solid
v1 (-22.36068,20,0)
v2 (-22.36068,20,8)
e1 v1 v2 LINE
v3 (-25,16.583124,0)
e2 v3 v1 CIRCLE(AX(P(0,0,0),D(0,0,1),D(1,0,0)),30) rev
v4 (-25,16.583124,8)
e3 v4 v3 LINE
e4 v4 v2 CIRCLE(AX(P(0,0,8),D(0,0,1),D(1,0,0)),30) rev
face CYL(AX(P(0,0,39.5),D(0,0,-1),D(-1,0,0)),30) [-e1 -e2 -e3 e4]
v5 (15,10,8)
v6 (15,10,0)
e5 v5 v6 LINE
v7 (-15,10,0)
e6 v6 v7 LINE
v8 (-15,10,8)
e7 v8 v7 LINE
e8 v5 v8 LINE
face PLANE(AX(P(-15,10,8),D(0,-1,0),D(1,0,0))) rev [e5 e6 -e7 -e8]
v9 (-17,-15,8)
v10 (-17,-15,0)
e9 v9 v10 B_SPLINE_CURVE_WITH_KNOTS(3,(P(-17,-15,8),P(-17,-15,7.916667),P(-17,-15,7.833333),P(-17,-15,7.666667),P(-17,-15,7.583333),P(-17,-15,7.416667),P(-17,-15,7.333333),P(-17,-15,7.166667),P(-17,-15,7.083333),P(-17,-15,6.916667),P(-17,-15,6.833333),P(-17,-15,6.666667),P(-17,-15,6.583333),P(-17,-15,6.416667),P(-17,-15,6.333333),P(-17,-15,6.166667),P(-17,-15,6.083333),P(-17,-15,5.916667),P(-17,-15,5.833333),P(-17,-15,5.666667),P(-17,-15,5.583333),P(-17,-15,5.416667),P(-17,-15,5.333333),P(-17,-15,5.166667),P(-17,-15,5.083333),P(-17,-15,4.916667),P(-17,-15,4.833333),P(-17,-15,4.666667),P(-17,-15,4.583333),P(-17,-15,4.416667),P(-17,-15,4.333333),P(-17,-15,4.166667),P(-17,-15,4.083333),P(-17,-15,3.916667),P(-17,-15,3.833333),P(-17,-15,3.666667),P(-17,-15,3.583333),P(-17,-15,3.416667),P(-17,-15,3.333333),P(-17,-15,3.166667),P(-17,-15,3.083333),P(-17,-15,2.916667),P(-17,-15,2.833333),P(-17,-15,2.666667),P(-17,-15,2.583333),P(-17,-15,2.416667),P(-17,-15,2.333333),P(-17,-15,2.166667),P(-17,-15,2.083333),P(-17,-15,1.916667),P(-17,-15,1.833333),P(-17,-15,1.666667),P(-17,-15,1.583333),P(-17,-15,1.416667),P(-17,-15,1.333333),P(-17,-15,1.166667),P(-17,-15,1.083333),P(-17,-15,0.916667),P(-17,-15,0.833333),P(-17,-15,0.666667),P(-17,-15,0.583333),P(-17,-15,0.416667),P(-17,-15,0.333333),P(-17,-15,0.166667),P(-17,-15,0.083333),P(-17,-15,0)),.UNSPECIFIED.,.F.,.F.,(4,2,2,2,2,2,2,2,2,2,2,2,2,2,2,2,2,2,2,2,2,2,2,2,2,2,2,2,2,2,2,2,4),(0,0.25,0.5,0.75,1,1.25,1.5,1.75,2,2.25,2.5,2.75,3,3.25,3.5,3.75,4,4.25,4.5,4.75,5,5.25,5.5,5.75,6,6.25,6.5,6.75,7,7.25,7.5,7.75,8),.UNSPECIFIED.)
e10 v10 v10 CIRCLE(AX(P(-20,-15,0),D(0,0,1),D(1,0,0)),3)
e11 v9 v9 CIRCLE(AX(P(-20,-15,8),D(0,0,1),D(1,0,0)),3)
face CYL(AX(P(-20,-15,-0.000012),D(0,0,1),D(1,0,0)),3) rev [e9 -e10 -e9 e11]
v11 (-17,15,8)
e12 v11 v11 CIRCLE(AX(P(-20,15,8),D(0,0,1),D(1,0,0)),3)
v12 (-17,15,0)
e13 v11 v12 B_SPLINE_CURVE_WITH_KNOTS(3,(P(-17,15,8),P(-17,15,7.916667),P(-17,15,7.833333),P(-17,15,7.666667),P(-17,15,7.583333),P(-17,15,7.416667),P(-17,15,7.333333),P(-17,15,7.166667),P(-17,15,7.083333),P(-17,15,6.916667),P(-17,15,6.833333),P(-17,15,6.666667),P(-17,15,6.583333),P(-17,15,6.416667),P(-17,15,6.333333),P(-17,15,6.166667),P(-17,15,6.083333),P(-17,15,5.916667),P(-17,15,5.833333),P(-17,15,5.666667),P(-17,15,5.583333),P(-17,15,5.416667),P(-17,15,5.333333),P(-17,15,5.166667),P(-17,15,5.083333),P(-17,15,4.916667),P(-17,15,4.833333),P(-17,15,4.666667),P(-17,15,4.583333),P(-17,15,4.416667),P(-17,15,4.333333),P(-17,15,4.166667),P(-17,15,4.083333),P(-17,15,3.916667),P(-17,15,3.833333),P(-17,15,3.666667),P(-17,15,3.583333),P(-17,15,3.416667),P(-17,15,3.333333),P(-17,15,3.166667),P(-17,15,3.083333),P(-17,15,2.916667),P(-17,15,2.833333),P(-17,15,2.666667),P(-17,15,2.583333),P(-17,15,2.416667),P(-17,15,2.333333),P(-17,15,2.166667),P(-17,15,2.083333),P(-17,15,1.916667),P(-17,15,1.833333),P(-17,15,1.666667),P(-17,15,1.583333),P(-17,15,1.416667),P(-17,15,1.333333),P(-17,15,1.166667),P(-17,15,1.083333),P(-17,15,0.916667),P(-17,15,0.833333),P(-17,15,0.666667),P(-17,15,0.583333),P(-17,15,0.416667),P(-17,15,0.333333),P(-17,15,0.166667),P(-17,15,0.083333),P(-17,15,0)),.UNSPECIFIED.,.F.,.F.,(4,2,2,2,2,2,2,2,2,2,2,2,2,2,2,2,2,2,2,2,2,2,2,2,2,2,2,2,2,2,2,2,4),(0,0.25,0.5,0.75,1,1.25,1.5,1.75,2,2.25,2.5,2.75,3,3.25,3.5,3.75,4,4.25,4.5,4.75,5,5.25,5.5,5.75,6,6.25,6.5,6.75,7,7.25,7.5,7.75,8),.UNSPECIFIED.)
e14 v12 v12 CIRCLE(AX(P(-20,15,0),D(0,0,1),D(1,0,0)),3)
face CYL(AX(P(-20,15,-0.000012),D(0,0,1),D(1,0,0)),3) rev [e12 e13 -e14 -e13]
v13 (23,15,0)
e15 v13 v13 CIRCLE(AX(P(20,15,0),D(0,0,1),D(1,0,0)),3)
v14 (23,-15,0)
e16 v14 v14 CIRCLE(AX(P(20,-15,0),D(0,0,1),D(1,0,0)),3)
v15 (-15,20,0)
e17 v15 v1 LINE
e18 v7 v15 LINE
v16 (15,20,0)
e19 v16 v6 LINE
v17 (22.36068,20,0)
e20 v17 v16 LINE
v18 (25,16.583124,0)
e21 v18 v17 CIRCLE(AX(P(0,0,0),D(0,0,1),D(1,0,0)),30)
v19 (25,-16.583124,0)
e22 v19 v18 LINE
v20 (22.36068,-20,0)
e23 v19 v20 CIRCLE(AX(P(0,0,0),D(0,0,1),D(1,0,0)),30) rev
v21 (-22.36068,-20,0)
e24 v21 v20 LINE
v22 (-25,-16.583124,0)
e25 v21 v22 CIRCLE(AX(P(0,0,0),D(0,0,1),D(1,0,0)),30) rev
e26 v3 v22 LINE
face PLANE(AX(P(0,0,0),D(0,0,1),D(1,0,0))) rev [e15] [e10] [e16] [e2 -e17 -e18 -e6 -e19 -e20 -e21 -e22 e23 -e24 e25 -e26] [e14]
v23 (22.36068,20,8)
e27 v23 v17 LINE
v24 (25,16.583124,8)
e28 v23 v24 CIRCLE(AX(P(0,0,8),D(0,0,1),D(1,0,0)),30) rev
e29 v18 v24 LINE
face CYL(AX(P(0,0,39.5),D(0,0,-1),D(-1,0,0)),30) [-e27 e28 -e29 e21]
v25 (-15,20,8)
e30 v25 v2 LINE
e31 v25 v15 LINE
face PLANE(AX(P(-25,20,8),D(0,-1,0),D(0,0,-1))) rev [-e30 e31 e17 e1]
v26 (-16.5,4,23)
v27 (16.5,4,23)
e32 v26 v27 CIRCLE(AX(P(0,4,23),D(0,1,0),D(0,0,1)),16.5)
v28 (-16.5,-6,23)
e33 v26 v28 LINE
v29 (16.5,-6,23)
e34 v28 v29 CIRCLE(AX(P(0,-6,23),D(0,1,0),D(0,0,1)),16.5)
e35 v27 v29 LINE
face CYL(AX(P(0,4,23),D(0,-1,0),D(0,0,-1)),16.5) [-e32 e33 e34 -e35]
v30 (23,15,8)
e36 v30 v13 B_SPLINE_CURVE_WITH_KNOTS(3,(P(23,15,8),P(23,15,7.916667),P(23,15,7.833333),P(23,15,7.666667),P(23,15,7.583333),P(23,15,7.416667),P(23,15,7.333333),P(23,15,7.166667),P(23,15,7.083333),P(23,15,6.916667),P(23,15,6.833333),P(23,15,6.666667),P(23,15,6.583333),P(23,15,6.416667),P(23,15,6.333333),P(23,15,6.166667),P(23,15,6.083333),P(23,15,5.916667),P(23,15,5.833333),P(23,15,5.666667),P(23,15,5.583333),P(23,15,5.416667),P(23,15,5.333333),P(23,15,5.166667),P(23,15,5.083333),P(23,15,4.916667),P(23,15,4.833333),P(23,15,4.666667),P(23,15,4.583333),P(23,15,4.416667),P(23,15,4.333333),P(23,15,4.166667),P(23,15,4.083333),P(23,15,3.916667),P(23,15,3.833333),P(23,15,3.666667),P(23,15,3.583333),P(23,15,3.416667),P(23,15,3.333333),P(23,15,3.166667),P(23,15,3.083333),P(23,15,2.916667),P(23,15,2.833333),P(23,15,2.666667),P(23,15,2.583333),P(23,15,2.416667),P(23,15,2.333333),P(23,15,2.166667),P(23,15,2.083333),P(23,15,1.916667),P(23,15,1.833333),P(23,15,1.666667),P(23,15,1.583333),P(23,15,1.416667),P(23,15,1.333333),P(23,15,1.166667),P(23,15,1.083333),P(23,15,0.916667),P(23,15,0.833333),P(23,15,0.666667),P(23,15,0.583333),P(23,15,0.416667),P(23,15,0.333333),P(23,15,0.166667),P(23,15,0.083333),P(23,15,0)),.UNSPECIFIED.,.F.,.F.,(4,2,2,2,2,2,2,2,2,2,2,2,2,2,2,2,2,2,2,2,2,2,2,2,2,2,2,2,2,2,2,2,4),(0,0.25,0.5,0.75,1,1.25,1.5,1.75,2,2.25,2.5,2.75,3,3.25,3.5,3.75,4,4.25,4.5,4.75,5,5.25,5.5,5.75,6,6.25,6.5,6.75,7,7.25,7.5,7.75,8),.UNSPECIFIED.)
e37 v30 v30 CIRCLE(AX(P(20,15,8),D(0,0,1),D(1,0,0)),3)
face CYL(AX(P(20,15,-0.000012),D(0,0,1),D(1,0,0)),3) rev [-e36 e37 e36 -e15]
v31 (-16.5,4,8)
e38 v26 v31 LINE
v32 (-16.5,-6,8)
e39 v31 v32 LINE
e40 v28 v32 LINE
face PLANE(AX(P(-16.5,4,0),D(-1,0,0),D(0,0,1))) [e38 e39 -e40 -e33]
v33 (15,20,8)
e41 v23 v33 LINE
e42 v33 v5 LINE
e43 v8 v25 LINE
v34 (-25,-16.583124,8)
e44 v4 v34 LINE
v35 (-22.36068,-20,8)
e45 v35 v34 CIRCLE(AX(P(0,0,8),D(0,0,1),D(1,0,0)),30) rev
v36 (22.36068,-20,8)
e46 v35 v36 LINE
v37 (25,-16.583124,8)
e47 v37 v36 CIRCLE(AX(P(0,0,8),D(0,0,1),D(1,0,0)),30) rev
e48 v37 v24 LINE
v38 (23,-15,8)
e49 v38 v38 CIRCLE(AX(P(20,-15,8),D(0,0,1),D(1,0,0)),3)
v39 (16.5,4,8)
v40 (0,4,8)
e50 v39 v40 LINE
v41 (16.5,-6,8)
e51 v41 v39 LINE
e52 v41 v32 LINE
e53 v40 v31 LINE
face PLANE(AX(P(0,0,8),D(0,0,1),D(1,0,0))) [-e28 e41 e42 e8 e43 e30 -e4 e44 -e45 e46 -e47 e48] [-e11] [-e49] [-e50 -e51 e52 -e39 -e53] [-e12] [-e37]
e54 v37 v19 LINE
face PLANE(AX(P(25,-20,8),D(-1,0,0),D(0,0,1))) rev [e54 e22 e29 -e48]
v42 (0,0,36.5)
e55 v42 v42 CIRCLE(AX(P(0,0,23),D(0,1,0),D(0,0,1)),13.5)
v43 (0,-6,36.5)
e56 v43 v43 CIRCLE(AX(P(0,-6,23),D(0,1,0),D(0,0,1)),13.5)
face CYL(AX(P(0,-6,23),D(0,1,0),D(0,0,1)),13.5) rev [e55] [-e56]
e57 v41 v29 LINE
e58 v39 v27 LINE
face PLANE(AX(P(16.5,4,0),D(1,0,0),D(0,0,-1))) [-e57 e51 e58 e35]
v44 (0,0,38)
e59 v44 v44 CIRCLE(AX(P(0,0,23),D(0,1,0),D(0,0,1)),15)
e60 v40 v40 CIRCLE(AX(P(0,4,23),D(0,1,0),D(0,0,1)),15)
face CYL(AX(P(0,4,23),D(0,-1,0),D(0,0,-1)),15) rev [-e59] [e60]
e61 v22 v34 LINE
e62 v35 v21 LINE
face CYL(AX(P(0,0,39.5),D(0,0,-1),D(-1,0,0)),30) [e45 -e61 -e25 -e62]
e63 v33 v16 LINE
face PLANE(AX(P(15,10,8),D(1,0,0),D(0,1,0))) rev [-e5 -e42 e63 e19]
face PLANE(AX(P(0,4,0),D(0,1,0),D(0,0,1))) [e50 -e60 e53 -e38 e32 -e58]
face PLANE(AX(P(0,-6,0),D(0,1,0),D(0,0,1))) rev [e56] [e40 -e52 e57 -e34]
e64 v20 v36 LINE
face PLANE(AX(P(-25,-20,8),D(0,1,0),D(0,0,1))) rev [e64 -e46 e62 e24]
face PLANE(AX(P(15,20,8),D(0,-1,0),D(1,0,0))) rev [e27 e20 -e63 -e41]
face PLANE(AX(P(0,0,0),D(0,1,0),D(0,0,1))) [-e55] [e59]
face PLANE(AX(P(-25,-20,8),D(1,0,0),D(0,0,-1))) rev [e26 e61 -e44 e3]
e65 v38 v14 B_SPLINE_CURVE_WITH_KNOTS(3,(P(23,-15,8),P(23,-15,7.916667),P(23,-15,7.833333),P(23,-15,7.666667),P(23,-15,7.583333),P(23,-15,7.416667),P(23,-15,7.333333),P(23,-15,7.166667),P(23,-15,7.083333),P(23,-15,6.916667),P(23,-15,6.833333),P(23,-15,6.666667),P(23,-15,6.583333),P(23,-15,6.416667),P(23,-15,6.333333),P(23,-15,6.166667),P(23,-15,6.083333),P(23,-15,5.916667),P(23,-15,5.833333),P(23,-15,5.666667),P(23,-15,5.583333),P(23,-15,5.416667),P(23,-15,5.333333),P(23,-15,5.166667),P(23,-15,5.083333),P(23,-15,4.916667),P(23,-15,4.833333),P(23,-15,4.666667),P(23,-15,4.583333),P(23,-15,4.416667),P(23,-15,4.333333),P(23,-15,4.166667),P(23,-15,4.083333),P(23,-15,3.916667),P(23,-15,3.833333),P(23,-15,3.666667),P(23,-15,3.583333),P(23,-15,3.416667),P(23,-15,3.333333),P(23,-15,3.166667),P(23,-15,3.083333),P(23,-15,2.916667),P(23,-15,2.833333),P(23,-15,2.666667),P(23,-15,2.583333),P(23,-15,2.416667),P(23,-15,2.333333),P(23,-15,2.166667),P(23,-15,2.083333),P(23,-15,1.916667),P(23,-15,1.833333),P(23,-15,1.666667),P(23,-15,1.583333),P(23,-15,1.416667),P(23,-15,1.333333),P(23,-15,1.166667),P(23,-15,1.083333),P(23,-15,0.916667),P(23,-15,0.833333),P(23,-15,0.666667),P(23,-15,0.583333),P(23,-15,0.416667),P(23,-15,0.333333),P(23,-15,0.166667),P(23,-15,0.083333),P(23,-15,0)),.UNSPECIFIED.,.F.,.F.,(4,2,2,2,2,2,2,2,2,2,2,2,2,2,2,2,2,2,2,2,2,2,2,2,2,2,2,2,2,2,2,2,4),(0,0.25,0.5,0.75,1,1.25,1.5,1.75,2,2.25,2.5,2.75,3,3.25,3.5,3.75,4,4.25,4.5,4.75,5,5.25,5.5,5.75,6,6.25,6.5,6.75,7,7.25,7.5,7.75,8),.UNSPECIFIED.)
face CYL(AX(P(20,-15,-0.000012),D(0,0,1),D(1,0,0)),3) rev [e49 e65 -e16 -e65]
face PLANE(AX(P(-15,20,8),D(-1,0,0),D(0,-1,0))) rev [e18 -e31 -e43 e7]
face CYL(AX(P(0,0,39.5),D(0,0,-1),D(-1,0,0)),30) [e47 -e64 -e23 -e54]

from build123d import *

# Parameters (mm, degrees)
BOSS_EXTRUDE1_DEPTH     = 8
CUT_EXTRUDE4_DEPTH      = 34
CUT_EXTRUDE4_DEPTH_BACK = 34
SKETCH2_R               = 3
SKETCH3_R               = 15
BOSS_EXTRUDE2_DEPTH     = 4
BOSS_EXTRUDE4_START     = -6
SKETCH3_5_R             = 15
SKETCH3_5_R_2           = 13.5
BOSS_EXTRUDE4_DEPTH     = 6
CUT_EXTRUDE5_DEPTH      = 8


# Read off the part's stored shape, not the designer's step: Cut-Extrude5
with BuildPart() as part:
    # Sketch1 → Boss-Extrude1 (new body)
    with BuildSketch(Plane.XY):
        Polygon((-25, -20), (25, -20), (25, 20), (15, 20), (15, 10), (-15, 10), (-15, 20), (-25, 20), align=None)
    extrude(amount=BOSS_EXTRUDE1_DEPTH)

    # Sketch2 → Cut-Extrude4 (cut, two sides: drawn at the far end of the back side and taken through both)
    with BuildSketch(Plane.XY.offset(-CUT_EXTRUDE4_DEPTH_BACK)):
        with Locations((-20, 15)):
            Circle(SKETCH2_R)
        with Locations((-20, -15)):
            Circle(SKETCH2_R)
        with Locations((20, -15)):
            Circle(SKETCH2_R)
        with Locations((20, 15)):
            Circle(SKETCH2_R)
    extrude(amount=CUT_EXTRUDE4_DEPTH + CUT_EXTRUDE4_DEPTH_BACK, mode=Mode.SUBTRACT)

    # Sketch3 → Boss-Extrude2 (add)
    with BuildSketch(Plane(origin=(0, 0, 0), x_dir=(1, 0, 0), z_dir=(0, 1, 0))):
        with BuildLine():
            Line((-16.5, -23), (-16.5, -7))
            Line((-16.5, -7), (16.5, -7))
            Line((16.5, -7), (16.5, -23))
            ThreePointArc((16.5, -23), (0, -39.5), (-16.5, -23))
        make_face()
        with Locations(Location((0, -23, 0), (0, 0, 90))):
            Circle(SKETCH3_R, mode=Mode.SUBTRACT)
    extrude(amount=BOSS_EXTRUDE2_DEPTH)

    # Sketch3<5> → Boss-Extrude4 (add)
    # profile 1 of 2: a face of its own
    with BuildSketch(Plane(origin=(0, 0, 0), x_dir=(1, 0, 0), z_dir=(0, 1, 0)).offset(BOSS_EXTRUDE4_START)):
        with BuildLine():
            Line((-16.5, -23), (-16.5, -7))
            Line((-16.5, -7), (16.5, -7))
            Line((16.5, -7), (16.5, -23))
            ThreePointArc((16.5, -23), (0, -39.5), (-16.5, -23))
        make_face()
        with Locations(Location((0, -23, 0), (0, 0, 90))):
            Circle(SKETCH3_5_R, mode=Mode.SUBTRACT)
    # profile 2 of 2: a face of its own
    with BuildSketch(Plane(origin=(0, 0, 0), x_dir=(1, 0, 0), z_dir=(0, 1, 0)).offset(BOSS_EXTRUDE4_START)):
        with Locations(Location((0, -23, 0), (0, 0, 90))):
            Circle(SKETCH3_5_R)
        with Locations(Location((0, -23, 0), (0, 0, 270))):
            Circle(SKETCH3_5_R_2, mode=Mode.SUBTRACT)
    extrude(amount=BOSS_EXTRUDE4_DEPTH)

    # Cut-Extrude5 outline → Cut-Extrude5 (cut)
    with BuildSketch(Plane.XY):
        with BuildLine():
            Line((25, 20), (22.360679775, 20))
            ThreePointArc((22.360679775, 20), (23.74188825, 18.339104186), (25, 16.583123952))
            Line((25, 16.583123952), (25, 20))
        make_face()
        with BuildLine():
            Line((-25, 20), (-25, 16.583123952))
            ThreePointArc((-25, 16.583123952), (-23.74188825, 18.339104186), (-22.360679775, 20))
            Line((-22.360679775, 20), (-25, 20))
        make_face()
        with BuildLine():
            Line((-25, -20), (-22.360679775, -20))
            ThreePointArc((-22.360679775, -20), (-23.74188825, -18.339104186), (-25, -16.583123952))
            Line((-25, -16.583123952), (-25, -20))
        make_face()
        with BuildLine():
            Line((25, -20), (25, -16.583123952))
            ThreePointArc((25, -16.583123952), (23.74188825, -18.339104186), (22.360679775, -20))
            Line((22.360679775, -20), (25, -20))
        make_face()
    extrude(amount=CUT_EXTRUDE5_DEPTH, mode=Mode.SUBTRACT)


solid = part.part
